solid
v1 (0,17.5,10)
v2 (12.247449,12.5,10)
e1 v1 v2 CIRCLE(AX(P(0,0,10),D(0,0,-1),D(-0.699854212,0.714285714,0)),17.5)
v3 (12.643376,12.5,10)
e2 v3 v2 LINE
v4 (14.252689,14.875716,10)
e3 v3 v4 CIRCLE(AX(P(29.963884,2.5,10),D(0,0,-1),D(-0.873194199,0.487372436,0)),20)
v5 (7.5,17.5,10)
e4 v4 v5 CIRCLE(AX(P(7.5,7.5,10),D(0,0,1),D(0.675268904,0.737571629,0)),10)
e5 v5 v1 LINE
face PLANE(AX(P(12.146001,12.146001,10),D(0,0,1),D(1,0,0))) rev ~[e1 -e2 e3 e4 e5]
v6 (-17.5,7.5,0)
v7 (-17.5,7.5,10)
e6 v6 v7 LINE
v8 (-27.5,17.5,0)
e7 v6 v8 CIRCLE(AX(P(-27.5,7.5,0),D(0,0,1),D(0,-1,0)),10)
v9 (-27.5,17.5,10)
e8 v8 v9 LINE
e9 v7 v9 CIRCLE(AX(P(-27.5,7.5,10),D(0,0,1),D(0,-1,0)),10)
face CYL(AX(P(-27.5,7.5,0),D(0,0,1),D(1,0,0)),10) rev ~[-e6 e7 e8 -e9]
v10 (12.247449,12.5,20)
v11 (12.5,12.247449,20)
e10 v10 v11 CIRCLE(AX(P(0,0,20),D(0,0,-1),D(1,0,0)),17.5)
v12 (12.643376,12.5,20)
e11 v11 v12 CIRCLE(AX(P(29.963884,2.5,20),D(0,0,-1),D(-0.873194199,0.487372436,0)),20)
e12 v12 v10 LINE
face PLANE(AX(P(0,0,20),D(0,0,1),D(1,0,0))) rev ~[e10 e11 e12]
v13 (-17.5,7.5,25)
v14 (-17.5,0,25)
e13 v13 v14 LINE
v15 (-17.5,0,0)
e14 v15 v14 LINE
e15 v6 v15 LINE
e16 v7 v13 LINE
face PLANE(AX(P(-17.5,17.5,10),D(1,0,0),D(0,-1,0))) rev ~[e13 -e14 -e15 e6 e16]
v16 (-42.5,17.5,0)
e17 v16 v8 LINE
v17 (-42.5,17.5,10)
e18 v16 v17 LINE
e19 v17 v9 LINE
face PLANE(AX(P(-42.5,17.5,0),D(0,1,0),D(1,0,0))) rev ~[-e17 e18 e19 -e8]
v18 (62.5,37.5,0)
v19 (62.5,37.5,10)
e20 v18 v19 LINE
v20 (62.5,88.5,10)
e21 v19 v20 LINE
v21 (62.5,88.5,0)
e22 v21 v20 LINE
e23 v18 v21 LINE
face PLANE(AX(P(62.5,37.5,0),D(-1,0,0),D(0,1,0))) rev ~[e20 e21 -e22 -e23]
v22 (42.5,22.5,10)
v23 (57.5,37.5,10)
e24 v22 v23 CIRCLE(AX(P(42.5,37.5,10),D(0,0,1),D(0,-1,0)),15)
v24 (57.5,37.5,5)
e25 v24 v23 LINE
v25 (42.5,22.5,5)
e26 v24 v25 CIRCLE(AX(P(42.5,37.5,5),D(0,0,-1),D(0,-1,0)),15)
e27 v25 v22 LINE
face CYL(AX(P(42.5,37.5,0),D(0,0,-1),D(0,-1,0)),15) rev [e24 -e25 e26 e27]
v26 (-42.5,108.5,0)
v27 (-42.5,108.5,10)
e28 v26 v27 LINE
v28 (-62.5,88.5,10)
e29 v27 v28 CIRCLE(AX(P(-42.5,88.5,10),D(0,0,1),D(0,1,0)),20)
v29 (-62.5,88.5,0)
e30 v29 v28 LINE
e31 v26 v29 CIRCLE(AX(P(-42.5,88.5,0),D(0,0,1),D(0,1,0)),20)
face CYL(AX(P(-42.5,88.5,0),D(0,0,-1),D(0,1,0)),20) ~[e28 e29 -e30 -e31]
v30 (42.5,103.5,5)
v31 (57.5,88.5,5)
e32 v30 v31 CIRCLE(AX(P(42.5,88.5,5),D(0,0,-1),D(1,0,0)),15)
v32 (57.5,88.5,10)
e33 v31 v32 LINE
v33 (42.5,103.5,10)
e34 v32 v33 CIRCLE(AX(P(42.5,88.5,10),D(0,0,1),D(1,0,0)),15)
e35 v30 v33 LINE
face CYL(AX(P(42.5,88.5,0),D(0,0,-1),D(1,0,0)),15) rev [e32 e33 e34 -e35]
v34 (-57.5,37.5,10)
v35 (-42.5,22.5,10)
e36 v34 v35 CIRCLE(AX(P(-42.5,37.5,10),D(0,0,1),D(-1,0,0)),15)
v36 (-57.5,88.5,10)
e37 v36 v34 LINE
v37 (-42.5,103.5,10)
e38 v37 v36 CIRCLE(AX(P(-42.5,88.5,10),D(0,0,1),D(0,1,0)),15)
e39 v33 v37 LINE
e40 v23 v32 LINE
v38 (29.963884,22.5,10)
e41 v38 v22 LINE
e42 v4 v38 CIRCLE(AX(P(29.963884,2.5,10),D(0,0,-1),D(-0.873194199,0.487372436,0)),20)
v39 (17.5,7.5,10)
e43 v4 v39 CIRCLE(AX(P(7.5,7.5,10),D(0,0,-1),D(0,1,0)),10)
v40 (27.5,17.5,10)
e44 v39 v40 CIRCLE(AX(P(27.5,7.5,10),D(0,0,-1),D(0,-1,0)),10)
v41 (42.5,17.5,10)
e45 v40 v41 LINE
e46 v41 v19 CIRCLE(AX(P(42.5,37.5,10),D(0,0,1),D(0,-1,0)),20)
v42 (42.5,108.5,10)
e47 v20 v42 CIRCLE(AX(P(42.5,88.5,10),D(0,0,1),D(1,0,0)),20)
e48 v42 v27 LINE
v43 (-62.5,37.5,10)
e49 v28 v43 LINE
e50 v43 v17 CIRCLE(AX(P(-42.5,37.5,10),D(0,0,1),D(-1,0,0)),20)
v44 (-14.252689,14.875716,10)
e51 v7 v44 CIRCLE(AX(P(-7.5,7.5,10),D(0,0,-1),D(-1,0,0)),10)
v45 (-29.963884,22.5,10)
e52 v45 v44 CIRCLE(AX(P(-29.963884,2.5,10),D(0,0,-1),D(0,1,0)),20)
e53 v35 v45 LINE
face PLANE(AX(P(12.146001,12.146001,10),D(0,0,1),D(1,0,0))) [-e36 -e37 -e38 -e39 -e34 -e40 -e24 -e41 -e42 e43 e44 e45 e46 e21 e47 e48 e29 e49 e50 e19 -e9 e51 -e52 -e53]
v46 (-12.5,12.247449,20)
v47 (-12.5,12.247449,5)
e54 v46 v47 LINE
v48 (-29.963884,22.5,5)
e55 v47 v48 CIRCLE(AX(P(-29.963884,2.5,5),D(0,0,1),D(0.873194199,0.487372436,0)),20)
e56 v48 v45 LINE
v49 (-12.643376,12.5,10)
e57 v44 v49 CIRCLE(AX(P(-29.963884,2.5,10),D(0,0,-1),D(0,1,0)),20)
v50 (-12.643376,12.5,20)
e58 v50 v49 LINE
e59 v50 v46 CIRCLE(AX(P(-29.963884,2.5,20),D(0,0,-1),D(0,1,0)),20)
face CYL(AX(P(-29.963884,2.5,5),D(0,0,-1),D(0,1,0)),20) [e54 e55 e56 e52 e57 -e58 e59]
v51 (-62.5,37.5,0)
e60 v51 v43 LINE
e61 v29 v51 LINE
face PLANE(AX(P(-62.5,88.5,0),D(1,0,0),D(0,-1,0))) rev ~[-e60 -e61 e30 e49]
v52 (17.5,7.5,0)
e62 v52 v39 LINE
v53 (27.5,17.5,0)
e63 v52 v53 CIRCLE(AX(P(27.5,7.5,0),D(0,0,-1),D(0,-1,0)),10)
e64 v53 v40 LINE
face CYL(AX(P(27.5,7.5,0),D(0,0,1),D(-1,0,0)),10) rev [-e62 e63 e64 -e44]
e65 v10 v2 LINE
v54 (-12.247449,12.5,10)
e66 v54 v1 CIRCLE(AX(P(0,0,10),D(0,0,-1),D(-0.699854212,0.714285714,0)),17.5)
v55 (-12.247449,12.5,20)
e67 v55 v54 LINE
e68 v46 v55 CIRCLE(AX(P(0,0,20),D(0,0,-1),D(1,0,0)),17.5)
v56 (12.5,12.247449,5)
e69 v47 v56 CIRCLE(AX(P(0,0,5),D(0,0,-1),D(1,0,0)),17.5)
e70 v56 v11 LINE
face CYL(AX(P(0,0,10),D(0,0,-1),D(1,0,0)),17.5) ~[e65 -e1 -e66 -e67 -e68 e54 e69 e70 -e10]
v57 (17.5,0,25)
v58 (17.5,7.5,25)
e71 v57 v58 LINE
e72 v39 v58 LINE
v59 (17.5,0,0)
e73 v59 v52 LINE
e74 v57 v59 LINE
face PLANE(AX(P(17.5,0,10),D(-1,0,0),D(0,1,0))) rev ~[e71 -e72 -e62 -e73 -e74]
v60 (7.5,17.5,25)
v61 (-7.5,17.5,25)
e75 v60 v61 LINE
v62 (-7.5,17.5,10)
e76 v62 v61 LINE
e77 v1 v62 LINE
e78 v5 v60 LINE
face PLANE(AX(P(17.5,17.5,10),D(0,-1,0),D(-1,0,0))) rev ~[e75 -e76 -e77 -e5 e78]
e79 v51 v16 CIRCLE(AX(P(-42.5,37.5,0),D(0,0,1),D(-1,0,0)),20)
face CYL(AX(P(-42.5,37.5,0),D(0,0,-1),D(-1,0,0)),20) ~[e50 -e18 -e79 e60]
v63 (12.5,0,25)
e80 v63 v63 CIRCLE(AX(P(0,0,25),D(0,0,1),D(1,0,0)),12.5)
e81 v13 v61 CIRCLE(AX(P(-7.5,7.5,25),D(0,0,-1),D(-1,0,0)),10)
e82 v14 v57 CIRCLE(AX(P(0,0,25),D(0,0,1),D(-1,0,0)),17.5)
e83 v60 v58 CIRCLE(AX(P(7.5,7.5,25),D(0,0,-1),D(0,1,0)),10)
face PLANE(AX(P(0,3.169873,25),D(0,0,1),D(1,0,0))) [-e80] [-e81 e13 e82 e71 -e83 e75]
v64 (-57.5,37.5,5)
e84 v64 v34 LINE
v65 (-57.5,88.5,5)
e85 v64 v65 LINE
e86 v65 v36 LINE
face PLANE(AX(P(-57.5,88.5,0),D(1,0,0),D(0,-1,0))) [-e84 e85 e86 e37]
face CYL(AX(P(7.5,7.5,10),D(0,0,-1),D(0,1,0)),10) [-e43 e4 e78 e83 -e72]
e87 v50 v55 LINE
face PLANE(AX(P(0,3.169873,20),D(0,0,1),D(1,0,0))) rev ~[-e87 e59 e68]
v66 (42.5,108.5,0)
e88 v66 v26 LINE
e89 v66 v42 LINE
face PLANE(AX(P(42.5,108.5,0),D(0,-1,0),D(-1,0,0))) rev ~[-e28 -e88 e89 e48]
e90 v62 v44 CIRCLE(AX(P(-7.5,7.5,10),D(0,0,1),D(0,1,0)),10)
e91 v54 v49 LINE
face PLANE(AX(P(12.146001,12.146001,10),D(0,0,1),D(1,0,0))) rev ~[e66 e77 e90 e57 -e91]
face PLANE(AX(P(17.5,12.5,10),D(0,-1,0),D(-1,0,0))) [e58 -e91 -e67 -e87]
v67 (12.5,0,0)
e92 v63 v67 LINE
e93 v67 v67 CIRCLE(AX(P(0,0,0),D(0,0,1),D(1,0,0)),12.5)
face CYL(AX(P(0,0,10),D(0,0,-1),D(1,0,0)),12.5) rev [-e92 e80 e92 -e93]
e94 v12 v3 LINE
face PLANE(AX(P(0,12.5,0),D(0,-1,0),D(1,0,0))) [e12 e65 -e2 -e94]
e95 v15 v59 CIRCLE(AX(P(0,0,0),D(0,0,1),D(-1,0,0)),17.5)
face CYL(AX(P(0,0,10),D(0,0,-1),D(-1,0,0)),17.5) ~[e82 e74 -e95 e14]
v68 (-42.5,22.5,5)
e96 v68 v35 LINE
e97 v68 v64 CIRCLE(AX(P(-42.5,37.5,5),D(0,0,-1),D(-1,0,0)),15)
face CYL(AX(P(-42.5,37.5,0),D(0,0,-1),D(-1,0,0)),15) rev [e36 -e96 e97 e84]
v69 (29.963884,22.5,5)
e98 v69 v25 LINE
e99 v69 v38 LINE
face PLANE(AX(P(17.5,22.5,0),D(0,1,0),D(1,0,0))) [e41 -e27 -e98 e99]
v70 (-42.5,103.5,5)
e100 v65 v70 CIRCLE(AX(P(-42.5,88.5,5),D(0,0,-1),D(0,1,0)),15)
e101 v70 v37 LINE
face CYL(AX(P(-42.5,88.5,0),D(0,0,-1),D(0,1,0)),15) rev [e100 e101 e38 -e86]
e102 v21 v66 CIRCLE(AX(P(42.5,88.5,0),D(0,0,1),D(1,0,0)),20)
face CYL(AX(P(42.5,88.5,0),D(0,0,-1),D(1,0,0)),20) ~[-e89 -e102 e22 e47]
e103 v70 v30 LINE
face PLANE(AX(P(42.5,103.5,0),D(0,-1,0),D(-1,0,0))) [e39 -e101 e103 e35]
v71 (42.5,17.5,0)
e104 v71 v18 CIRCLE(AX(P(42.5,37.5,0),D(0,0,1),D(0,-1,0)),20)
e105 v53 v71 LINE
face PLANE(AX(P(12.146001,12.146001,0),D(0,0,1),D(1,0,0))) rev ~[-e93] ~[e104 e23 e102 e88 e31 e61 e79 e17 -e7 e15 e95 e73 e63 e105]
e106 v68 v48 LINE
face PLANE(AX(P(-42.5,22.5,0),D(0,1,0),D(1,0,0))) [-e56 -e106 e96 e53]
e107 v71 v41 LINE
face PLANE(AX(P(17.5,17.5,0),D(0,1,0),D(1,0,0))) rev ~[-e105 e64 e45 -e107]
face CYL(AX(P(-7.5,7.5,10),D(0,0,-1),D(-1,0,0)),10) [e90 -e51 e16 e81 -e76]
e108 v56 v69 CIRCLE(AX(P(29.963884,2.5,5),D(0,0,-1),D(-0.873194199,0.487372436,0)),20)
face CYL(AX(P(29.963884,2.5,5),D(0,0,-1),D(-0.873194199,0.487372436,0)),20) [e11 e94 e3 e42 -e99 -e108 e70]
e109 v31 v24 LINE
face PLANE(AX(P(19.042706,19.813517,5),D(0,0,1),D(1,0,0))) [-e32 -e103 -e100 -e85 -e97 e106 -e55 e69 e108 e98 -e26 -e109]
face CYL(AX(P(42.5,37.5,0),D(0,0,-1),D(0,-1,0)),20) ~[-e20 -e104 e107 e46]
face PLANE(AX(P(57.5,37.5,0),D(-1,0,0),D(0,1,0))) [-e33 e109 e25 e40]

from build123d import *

# Parameters (mm, degrees)
F0_R         = 12.5
F1_DEPTH     = 10
F2_R         = 12.5
F3_DEPTH     = 15
F4_T         = 5
F4_T3_DEPTH  = 20
F5_R         = 10
F6_T1_DEPTH  = 40
F7_T1_DEPTH  = 5
F7_T6_DEPTH  = 92.3194198861
F7_T13_DEPTH = 48.659709943


# Not quite as in the source:
# - a fillet or chamfer that OpenCascade refuses, or shapes differently, is made with other operations: its cross-section is extruded or revolved along the edge and cut away or added
# - a shell that OpenCascade refuses in one call is made with other operations: the cavity is built on its own and cut out


with BuildPart() as f1:
    # F0 (on Top) → F1 (new body)
    with BuildSketch(Plane.XY):
        with BuildLine():
            Line((17.5, 0), (17.5, 17.5))
            Line((17.5, 17.5), (0, 17.5))
            ThreePointArc((0, 17.5), (12.3743686708, 12.3743686708), (17.5, 0))
        make_face()
        with BuildLine():
            Line((0, 17.5), (-17.5, 17.5))
            Line((-17.5, 17.5), (-17.5, 0))
            ThreePointArc((-17.5, 0), (-12.3743686708, 12.3743686708), (0, 17.5))
        make_face()
        with BuildLine():
            ThreePointArc((17.5, 0), (12.3743686708, 12.3743686708), (0, 17.5))
            ThreePointArc((0, 17.5), (-12.3743686708, 12.3743686708), (-17.5, 0))
            ThreePointArc((-17.5, 0), (0, -17.5), (17.5, 0))
        make_face()
        Circle(F0_R, mode=Mode.SUBTRACT)
        with BuildLine():
            Line((42.5, 108.5), (0, 108.5))
            Line((0, 108.5), (-42.5, 108.5))
            ThreePointArc((-42.5, 108.5), (-56.6421356237, 102.6421356237), (-62.5, 88.5))
            Line((-62.5, 88.5), (-62.5, 37.5))
            ThreePointArc((-62.5, 37.5), (-56.6421356237, 23.3578643763), (-42.5, 17.5))
            Line((-42.5, 17.5), (-17.5, 17.5))
            Line((-17.5, 17.5), (0, 17.5))
            Line((0, 17.5), (17.5, 17.5))
            Line((17.5, 17.5), (42.5, 17.5))
            ThreePointArc((42.5, 17.5), (56.6421356237, 23.3578643763), (62.5, 37.5))
            Line((62.5, 37.5), (62.5, 88.5))
            ThreePointArc((62.5, 88.5), (56.6421356237, 102.6421356237), (42.5, 108.5))
        make_face()
    extrude(amount=F1_DEPTH)

    # F2 (on face) → F3 (join)
    with BuildSketch(Plane.XY.offset(10)):
        with BuildLine():
            Line((17.5, 17.5), (-17.5, 17.5))
            Line((-17.5, 17.5), (-17.5, 0))
            ThreePointArc((-17.5, 0), (0, -17.5), (17.5, 0))
            Line((17.5, 0), (17.5, 17.5))
        make_face()
        Circle(F2_R, mode=Mode.SUBTRACT)
    extrude(amount=F3_DEPTH)

    # F4: shell of thickness 5, made by hand


with BuildPart() as f4_core1:
    # F4_t2: copy of F1
    add(f1.part)

    # the walls: a layer under each face that stays
    f4_faces = [f4_core1.faces().sort_by_distance(p)[0] for p in [
        (0, -17.5, 12.5),
        (0, 45.5, 0),
        (-12.5, 0, 12.5),
        (-30, 17.5, 5),
        (0, 17.5, 17.5),
        (-56.6421356237, 23.3578643763, 5),
        (-62.5, 63, 5),
        (-56.6421356237, 102.6421356237, 5),
        (0, 108.5, 5),
        (56.6421356237, 102.6421356237, 5),
        (62.5, 63, 5),
        (56.6421356237, 23.3578643763, 5),
        (30, 17.5, 5),
        (17.5, 8.75, 12.5),
        (-11.6666666667, -11.6666666667, 25),
        (-17.5, 8.75, 12.5),
    ]]
    thicken(f4_faces, amount=-F4_T, mode=Mode.SUBTRACT)

    # F4_s4 → F4_t3 (cut)
    with BuildSketch(Plane.XY.offset(-5)):
        Polygon((-17.55, 17.45), (-17.5, 22.5), (-12.5, 22.5), (-12.5, 17.5), align=None)
        Polygon((17.55, 17.45), (17.5, 22.5), (12.5, 22.5), (12.5, 17.5), align=None)
    extrude(amount=F4_T3_DEPTH, mode=Mode.SUBTRACT)


with BuildPart() as f1_1:
    add(f1.part)

    # what is left inside the walls is the cavity
    f4_cavity = [f4_core1.part.solids().sort_by_distance(p)[0] for p in [
        (0, 42.664966, 5.05),
    ]]
    add(f4_cavity, mode=Mode.SUBTRACT)

    # F5
    f5_edges = [f1_1.edges().sort_by_distance(p)[0] for p in [
        (17.5, 17.5, 5),
        (-17.5, 17.5, 5),
    ]]
    fillet(f5_edges, radius=F5_R)

    # F6: fillet of radius 10 on 2 edges, made by hand

    # F6_s2 → F6_t1 (cut)
    with BuildSketch(Plane.XY.offset(10)):
        with BuildLine():
            ThreePointArc((7.5, 17.5), (14.5710678119, 14.5710678119), (17.5, 7.5))
            Line((17.5, 7.5), (17.5, 17.5))
            Line((17.5, 17.5), (7.5, 17.5))
        make_face()
        with BuildLine():
            ThreePointArc((-17.5, 7.5), (-14.5710678119, 14.5710678119), (-7.5, 17.5))
            Line((-7.5, 17.5), (-17.5, 17.5))
            Line((-17.5, 17.5), (-17.5, 7.5))
        make_face()
    extrude(amount=F6_T1_DEPTH, mode=Mode.SUBTRACT)

    # F7: fillet of radius 20 on 2 edges, made by hand

    # F7_s2 → F7_t1 (cut)
    with BuildSketch(Plane.XY.offset(5)):
        with BuildLine():
            ThreePointArc((12.5, 12.2474487139), (19.8383956996, 19.7474487139), (29.9638839772, 22.5))
            Line((29.9638839772, 22.5), (12.5, 22.5))
            Line((12.5, 22.5), (12.5, 12.2474487139))
        make_face()
        with BuildLine():
            ThreePointArc((-29.9638839772, 22.5), (-19.8383956996, 19.7474487139), (-12.5, 12.2474487139))
            Line((-12.5, 12.2474487139), (-12.5, 22.5))
            Line((-12.5, 22.5), (-29.9638839772, 22.5))
        make_face()
    extrude(amount=F7_T1_DEPTH, mode=Mode.SUBTRACT)


with BuildPart() as f7_tool4:
    # F7_s5 → F7_t6 (new body)
    with BuildSketch(Plane.XY.offset(-38.659709943)):
        with BuildLine():
            ThreePointArc((12.5, 12.2474487139), (19.8383956996, 19.7474487139), (29.9638839772, 22.5))
            Line((29.9638839772, 22.5), (12.5, 22.5))
            Line((12.5, 22.5), (12.5, 12.2474487139))
        make_face()
    extrude(amount=F7_T6_DEPTH)

    split(bisect_by=Plane.XZ.offset(-12.5), keep=Keep.TOP)

    split(bisect_by=Plane.XY.offset(20), keep=Keep.BOTTOM)

    split(bisect_by=Plane.XY.offset(10), keep=Keep.TOP)


with BuildPart() as f1_2:
    add(f1_1.part)

    # F7_t3: cut F7_tool4
    add(f7_tool4.part, mode=Mode.SUBTRACT)


with BuildPart() as f7_tool11:
    # F7_s12 → F7_t13 (new body)
    with BuildSketch(Plane.XY.offset(5)):
        with BuildLine():
            ThreePointArc((-29.9638839772, 22.5), (-19.8383956996, 19.7474487139), (-12.5, 12.2474487139))
            Line((-12.5, 12.2474487139), (-12.5, 22.5))
            Line((-12.5, 22.5), (-29.9638839772, 22.5))
        make_face()
    extrude(amount=F7_T13_DEPTH)

    split(bisect_by=Plane.XZ.offset(-12.5), keep=Keep.TOP)

    split(bisect_by=Plane.XY.offset(20), keep=Keep.BOTTOM)


with BuildPart() as f1_3:
    add(f1_2.part)

    # F7_t10: cut F7_tool11
    add(f7_tool11.part, mode=Mode.SUBTRACT)


solid = f1_3.part
